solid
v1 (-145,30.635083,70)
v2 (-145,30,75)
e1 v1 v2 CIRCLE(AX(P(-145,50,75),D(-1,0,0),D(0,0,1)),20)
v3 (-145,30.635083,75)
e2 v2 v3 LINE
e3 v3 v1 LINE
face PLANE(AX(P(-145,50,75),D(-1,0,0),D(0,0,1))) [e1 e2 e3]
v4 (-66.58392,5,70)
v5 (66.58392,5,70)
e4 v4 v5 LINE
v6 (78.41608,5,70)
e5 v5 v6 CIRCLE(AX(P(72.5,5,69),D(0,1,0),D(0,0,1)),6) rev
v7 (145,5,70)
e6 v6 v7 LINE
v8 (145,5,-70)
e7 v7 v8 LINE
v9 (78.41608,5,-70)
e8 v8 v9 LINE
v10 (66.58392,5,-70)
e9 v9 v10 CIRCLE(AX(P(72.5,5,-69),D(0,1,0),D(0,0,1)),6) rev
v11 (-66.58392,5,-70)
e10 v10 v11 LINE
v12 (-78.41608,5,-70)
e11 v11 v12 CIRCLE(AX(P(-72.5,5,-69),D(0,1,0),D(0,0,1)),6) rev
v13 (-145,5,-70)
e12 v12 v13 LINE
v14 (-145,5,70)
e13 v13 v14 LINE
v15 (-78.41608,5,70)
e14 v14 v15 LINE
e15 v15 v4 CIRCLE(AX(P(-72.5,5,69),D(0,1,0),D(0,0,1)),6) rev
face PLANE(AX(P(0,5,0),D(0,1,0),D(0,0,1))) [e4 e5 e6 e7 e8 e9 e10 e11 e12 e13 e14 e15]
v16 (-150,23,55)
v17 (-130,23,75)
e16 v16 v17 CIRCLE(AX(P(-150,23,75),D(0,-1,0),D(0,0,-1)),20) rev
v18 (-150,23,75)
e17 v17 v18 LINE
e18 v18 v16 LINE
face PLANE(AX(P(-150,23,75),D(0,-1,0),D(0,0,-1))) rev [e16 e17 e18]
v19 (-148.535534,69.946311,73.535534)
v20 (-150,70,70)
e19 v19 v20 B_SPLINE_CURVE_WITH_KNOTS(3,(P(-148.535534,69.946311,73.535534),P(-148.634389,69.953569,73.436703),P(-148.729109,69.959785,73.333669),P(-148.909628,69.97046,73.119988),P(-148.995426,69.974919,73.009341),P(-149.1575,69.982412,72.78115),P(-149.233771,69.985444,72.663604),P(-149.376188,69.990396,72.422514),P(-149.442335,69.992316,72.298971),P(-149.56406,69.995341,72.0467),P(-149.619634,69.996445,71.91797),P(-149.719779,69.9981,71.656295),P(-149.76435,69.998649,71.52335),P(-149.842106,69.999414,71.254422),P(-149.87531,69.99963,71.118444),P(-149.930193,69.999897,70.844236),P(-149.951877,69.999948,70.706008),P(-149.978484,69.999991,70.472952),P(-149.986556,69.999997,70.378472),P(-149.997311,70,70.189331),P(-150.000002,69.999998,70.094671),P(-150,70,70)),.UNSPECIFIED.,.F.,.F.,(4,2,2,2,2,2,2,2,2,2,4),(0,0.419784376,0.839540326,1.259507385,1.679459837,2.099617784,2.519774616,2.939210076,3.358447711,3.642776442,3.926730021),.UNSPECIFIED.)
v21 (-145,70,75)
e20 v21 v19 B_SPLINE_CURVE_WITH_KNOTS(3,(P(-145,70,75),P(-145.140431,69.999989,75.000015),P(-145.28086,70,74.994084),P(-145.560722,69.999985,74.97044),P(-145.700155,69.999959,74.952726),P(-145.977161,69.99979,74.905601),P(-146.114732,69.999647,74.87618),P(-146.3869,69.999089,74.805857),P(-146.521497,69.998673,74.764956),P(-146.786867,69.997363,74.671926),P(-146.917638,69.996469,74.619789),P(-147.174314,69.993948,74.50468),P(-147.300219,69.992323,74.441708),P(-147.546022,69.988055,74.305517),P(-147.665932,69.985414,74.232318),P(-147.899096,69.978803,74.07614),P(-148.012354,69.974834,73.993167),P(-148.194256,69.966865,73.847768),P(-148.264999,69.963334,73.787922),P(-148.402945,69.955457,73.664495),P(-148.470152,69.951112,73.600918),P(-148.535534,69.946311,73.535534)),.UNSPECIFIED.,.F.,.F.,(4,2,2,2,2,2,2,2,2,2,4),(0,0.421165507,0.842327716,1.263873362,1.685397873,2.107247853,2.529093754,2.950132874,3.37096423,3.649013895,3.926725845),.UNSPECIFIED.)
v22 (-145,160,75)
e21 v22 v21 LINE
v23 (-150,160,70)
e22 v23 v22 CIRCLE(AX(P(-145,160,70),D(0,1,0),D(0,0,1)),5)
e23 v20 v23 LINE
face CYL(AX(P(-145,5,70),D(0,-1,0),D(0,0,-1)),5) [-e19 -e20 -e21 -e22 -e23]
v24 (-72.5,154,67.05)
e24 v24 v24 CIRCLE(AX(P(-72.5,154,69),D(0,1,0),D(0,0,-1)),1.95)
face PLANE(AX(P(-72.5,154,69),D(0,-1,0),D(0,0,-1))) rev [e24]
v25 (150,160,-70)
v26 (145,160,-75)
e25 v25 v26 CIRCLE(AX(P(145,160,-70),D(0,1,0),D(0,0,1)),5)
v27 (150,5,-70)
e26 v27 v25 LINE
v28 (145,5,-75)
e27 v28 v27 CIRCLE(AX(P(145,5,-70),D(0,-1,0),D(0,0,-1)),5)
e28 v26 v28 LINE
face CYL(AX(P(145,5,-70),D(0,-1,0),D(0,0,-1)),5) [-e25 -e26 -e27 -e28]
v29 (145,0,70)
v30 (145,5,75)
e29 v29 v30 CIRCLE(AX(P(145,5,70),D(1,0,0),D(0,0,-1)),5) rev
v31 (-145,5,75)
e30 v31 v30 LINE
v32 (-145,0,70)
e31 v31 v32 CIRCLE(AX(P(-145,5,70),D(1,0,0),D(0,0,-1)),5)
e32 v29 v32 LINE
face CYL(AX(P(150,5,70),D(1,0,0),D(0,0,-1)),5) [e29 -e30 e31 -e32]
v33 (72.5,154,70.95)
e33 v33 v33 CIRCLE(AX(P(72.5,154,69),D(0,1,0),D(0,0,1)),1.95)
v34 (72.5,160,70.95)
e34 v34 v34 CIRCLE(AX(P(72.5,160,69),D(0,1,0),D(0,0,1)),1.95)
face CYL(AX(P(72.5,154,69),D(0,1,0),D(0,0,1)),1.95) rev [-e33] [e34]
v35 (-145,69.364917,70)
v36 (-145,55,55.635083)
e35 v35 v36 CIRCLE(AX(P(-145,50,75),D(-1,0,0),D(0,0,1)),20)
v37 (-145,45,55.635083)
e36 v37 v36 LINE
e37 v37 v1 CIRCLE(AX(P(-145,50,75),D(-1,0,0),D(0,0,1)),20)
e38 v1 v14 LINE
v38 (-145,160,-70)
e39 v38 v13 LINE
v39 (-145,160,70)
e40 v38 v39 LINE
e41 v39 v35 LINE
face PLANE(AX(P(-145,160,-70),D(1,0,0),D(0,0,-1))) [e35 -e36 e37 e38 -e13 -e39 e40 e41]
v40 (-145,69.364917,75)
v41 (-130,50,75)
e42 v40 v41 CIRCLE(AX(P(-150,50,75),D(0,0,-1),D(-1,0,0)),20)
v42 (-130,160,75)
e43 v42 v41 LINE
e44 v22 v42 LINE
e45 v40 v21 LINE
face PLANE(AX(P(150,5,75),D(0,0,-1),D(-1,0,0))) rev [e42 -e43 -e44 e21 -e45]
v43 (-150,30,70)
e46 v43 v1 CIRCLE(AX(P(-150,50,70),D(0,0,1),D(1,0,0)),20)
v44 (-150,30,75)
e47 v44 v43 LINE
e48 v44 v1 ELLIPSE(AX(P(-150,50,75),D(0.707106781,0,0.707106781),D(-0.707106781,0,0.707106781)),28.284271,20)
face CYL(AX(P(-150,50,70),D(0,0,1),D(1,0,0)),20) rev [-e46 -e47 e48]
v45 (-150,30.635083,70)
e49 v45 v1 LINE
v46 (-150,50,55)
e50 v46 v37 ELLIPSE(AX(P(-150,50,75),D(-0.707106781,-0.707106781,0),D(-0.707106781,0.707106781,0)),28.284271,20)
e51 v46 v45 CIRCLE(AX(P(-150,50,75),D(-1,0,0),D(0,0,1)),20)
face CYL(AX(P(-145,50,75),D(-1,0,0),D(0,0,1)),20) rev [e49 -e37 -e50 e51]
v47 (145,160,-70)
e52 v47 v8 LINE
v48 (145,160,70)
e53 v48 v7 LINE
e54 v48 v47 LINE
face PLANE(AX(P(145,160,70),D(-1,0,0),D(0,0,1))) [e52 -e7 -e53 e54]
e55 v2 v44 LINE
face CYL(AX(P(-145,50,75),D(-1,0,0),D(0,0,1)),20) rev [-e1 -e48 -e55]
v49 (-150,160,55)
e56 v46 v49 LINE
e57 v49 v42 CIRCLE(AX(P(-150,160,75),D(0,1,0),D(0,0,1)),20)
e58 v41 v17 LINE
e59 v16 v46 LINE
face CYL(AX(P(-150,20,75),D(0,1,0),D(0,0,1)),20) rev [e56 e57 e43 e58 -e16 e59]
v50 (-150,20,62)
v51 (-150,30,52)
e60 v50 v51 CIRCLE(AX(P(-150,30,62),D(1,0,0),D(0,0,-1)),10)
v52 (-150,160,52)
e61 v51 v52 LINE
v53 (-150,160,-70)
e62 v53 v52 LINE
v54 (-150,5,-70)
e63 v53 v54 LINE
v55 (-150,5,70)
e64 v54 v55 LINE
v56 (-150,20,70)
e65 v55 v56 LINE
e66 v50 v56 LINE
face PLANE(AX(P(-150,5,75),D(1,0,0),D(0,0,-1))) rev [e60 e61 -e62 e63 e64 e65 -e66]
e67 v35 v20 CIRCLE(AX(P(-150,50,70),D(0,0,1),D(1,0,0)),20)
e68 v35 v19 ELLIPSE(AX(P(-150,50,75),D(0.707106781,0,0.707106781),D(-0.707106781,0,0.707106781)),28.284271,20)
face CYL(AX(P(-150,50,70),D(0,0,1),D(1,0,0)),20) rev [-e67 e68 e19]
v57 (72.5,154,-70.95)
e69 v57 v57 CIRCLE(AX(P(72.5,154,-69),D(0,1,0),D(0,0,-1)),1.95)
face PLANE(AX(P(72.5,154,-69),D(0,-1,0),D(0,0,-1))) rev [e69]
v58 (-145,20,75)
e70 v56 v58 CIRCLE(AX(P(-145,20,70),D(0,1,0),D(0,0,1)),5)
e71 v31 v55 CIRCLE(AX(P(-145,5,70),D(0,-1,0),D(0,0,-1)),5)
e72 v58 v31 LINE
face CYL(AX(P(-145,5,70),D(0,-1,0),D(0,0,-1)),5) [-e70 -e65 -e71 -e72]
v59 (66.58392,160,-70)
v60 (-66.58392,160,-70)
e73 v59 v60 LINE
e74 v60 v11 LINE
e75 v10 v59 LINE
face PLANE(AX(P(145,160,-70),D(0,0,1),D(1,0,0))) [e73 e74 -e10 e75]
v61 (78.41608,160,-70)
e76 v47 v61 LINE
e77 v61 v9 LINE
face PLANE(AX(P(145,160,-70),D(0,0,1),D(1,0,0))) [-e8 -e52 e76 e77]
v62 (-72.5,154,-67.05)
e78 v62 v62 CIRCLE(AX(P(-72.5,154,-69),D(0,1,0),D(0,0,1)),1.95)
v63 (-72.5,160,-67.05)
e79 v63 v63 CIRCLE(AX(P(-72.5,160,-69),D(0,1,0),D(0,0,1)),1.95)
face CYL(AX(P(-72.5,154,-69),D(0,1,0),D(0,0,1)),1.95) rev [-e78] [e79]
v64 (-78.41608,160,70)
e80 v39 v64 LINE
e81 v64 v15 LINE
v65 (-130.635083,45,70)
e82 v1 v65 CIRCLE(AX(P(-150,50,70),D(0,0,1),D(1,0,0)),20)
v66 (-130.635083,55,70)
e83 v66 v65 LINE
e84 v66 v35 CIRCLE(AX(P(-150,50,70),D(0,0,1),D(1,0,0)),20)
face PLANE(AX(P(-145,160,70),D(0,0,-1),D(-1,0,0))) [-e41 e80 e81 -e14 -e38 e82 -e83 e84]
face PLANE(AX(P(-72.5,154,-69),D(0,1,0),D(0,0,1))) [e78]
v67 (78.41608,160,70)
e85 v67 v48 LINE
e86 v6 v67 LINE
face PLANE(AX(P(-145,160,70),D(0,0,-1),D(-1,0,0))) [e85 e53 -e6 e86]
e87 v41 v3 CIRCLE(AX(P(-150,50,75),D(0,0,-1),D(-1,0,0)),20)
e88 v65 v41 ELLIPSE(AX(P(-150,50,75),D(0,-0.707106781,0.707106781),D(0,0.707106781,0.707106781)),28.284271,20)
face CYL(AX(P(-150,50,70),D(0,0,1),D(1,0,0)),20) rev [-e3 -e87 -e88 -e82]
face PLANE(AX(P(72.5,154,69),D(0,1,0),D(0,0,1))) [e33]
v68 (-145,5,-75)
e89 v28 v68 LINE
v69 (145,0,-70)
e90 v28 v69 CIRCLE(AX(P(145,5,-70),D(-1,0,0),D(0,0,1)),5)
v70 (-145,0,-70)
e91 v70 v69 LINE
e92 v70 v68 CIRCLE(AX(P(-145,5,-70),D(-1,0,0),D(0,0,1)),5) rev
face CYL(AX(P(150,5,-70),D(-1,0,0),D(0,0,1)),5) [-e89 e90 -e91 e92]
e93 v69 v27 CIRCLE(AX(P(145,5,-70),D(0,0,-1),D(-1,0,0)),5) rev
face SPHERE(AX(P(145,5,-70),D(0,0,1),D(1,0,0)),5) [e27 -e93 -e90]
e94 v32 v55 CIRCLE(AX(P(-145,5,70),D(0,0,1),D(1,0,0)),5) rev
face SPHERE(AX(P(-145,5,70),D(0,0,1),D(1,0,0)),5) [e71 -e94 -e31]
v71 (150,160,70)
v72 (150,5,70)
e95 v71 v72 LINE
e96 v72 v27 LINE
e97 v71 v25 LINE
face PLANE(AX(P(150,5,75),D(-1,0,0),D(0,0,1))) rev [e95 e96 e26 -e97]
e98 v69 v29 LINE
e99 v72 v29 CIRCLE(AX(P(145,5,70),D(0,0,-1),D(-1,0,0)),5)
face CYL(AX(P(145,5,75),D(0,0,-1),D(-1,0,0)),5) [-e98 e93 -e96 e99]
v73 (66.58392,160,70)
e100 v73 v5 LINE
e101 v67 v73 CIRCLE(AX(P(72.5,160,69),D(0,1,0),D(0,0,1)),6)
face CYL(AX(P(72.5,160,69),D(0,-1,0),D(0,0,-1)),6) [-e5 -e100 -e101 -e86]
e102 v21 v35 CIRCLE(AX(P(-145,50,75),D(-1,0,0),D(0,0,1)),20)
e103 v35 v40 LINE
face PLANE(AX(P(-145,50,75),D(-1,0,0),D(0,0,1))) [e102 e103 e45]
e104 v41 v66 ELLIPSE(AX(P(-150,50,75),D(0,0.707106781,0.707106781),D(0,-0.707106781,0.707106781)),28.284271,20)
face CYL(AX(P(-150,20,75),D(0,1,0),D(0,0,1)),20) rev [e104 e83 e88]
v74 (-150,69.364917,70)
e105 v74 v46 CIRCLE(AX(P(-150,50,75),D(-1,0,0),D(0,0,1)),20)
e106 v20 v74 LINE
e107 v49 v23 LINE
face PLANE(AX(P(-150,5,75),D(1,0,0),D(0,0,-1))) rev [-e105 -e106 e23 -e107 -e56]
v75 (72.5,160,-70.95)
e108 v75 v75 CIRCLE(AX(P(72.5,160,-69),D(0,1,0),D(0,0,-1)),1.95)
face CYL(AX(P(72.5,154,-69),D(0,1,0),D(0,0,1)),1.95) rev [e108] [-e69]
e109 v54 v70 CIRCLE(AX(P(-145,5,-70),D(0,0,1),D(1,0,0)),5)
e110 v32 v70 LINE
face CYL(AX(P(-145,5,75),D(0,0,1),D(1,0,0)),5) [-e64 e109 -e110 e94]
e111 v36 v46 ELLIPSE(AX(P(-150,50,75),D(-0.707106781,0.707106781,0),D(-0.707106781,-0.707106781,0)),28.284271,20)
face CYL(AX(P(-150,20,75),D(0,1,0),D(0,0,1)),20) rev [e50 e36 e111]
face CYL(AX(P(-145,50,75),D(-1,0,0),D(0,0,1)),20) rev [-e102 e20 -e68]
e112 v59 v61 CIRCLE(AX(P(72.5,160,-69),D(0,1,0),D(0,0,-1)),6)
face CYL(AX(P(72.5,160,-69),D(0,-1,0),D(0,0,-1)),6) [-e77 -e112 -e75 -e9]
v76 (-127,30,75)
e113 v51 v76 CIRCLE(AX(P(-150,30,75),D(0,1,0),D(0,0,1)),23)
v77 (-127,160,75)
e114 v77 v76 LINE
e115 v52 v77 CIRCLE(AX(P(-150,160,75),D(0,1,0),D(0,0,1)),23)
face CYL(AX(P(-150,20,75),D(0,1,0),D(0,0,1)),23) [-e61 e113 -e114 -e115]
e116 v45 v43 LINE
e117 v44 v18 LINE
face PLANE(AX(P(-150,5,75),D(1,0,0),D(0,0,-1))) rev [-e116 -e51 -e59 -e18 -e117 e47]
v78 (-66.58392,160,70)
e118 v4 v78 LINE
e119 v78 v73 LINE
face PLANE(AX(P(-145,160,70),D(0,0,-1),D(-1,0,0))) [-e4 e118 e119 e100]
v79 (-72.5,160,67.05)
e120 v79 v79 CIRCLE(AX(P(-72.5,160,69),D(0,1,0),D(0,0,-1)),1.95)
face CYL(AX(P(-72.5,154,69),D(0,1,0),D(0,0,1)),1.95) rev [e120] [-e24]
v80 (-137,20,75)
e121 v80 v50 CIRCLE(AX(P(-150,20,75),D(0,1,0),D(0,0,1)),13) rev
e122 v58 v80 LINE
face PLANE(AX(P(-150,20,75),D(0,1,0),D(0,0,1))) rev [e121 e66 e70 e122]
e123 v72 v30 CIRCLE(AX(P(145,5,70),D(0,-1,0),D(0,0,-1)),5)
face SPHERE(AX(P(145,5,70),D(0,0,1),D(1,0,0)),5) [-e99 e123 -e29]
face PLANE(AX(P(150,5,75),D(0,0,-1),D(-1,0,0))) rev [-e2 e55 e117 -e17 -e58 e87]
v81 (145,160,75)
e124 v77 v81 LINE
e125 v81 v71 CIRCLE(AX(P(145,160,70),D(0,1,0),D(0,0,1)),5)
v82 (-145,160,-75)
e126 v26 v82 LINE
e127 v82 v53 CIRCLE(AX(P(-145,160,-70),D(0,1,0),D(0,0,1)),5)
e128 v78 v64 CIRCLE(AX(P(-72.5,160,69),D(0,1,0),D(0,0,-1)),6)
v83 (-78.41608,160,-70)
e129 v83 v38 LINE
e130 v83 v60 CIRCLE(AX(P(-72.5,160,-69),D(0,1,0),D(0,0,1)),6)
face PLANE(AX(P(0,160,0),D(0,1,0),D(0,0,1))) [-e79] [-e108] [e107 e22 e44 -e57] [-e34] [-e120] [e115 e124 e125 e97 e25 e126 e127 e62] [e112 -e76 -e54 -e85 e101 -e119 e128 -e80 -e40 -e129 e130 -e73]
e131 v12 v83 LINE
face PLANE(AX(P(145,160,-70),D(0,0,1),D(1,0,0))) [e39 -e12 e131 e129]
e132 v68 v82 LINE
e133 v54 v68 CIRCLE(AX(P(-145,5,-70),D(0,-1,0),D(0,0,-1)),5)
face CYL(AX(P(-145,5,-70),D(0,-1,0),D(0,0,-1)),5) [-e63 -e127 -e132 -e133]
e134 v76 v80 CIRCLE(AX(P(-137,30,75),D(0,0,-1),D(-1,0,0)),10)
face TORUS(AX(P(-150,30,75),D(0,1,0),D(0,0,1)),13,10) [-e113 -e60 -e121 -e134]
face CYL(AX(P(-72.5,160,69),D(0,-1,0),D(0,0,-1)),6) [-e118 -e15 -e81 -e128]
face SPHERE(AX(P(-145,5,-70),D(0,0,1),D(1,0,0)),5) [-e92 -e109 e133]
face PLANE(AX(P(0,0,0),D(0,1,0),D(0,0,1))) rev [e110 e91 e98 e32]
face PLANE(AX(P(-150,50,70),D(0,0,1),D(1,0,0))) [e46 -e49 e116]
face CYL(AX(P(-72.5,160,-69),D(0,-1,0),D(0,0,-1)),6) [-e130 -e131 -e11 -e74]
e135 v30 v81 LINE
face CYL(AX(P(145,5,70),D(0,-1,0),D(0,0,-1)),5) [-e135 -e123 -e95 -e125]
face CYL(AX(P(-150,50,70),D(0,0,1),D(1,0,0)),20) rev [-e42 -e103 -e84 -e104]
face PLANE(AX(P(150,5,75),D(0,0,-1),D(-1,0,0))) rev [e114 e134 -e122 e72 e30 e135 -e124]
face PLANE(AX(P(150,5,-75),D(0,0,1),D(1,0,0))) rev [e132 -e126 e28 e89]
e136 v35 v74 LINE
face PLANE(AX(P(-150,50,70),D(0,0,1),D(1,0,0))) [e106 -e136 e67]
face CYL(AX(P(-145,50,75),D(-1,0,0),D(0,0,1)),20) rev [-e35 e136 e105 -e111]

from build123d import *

# Parameters (mm, degrees)
ESQUISSE1_W             = 300
ESQUISSE1_H             = 150
BOSS_EXTRU_1_DEPTH      = 5
ESQUISSE3_W             = 300
ESQUISSE3_H             = 150
ESQUISSE3_W_2           = 290
ESQUISSE3_H_2           = 140
BOSS_EXTRU_2_DEPTH      = 155
ESQUISSE4_R             = 6
BOSS_EXTRU_4_DEPTH      = 155
ESQUISSE5_R             = 1.95
ENL_V_MAT_EXTRU_1_DEPTH = 6
ESQUISSE6_R             = 20
ENL_V_MAT_EXTRU_2_DEPTH = 5
ESQUISSE7_R             = 20
ENL_V_MAT_EXTRU_3_DEPTH = 5
ESQUISSE8_R             = 23
ESQUISSE8_R_2           = 20
BOSS_EXTRU_5_DEPTH      = 140
BOSS_EXTRU_6_START      = -3
ESQUISSE9_R             = 20
BOSS_EXTRU_6_DEPTH      = 3
BOSS_EXTRU_7_DEPTH      = 3
CONG_1_R                = 10
CONG_2_R                = 5
CONG_3_R                = 5
ESQUISSE12_W            = 17.449944321
ESQUISSE12_H            = 17.449944321
ENL_V_MAT_EXTRU_5_DEPTH = 152


# Some blends are built 0.0001 mm under size
with BuildPart() as part:
    # Esquisse1 → Boss.-Extru.1 (new body)
    with BuildSketch(Plane(origin=(0, 0, 0), x_dir=(1, 0, 0), z_dir=(0, 1, 0))):
        Rectangle(ESQUISSE1_W, ESQUISSE1_H)
    extrude(amount=BOSS_EXTRU_1_DEPTH)

    # Esquisse3 → Boss.-Extru.2 (add)
    with BuildSketch(Plane(origin=(0, 5, 0), x_dir=(1, 0, 0), z_dir=(0, 1, 0))):
        Rectangle(ESQUISSE3_W, ESQUISSE3_H)
        Rectangle(ESQUISSE3_W_2, ESQUISSE3_H_2, mode=Mode.SUBTRACT)
    extrude(amount=BOSS_EXTRU_2_DEPTH)

    # Esquisse4 → Boss.-Extru.4 (add)
    with BuildSketch(Plane(origin=(0, 5, 0), x_dir=(1, 0, 0), z_dir=(0, 1, 0))):
        with Locations((-72.5, 69)):
            Circle(ESQUISSE4_R)
        with Locations((72.5, 69)):
            Circle(ESQUISSE4_R)
        with Locations((72.5, -69)):
            Circle(ESQUISSE4_R)
        with Locations((-72.5, -69)):
            Circle(ESQUISSE4_R)
    extrude(amount=BOSS_EXTRU_4_DEPTH)

    # Esquisse5 → Enlèv. mat.-Extru.1 (cut)
    with BuildSketch(Plane(origin=(0, 160, 0), x_dir=(1, 0, 0), z_dir=(0, 1, 0))):
        with Locations(Location((-72.5, 69, 0), (0, 0, 270))):
            Circle(ESQUISSE5_R)
        with Locations(Location((72.5, 69, 0), (0, 0, 90))):
            Circle(ESQUISSE5_R)
        with Locations(Location((72.5, -69, 0), (0, 0, 270))):
            Circle(ESQUISSE5_R)
        with Locations(Location((-72.5, -69, 0), (0, 0, 90))):
            Circle(ESQUISSE5_R)
    extrude(amount=-ENL_V_MAT_EXTRU_1_DEPTH, mode=Mode.SUBTRACT)

    # Esquisse6 → Enlèv. mat.-Extru.2 (cut)
    with BuildSketch(Plane.XY.offset(75)):
        with Locations((-150, 50)):
            Circle(ESQUISSE6_R)
    extrude(amount=-ENL_V_MAT_EXTRU_2_DEPTH, mode=Mode.SUBTRACT)

    # Esquisse7 → Enlèv. mat.-Extru.3 (cut)
    with BuildSketch(Plane.ZY.offset(150)):
        with Locations((75, 50)):
            Circle(ESQUISSE7_R)
    extrude(amount=-ENL_V_MAT_EXTRU_3_DEPTH, mode=Mode.SUBTRACT)

    # Esquisse8 → Boss.-Extru.5 (add)
    with BuildSketch(Plane(origin=(0, 160, 0), x_dir=(1, 0, 0), z_dir=(0, 1, 0))):
        with Locations((-150, -75)):
            Circle(ESQUISSE8_R)
        with Locations((-150, -75)):
            Circle(ESQUISSE8_R_2, mode=Mode.SUBTRACT)
    extrude(amount=-BOSS_EXTRU_5_DEPTH)

    # Esquisse9 → Boss.-Extru.6 (add)
    with BuildSketch(Plane.XZ.offset(-20).offset(BOSS_EXTRU_6_START)):
        with Locations((-150, 75)):
            Circle(ESQUISSE9_R)
    extrude(amount=BOSS_EXTRU_6_DEPTH)

    # Esquisse10 → Boss.-Extru.7 (add)
    with BuildSketch(Plane(origin=(0, 160, 0), x_dir=(1, 0, 0), z_dir=(0, 1, 0))):
        with BuildLine():
            Line((-150, -52), (-150, -75))
            Line((-150, -75), (-127, -75))
            ThreePointArc((-127, -75), (-133.736544033, -58.736544033), (-150, -52))
        make_face()
    extrude(amount=-BOSS_EXTRU_7_DEPTH)

    # Congé1
    cong_1_edges = [part.edges().sort_by_distance(p)[0] for p in [
        (-166.263455967, 20, 91.263455967),
    ]]
    fillet(cong_1_edges, radius=CONG_1_R)

    # Congé2
    cong_2_edges = [part.edges().sort_by_distance(p)[0] for p in [
        (0, 0, -75),
        (150, 0, 0),
        (0, 0, 75),
        (-150, 0, 0),
    ]]
    fillet(cong_2_edges, radius=CONG_2_R - 0.0001)  # a hair under: the kernel refuses the full size

    # Congé3
    # the kernel refuses this fillet: 5 mm, written as the material it takes off along each edge
    with BuildSketch(Plane(origin=(-145, 0, 70), x_dir=(0, 0, 1), z_dir=(1, 0, 0))) as cong_3_piece_1:
        with BuildLine():
            CenterArc((0.0001, -4.9999), 4.9999, 0, 90)
            Line((5, -4.9999), (5, 0))
            Line((5, 0), (0.0001, 0))
        make_face()
    revolve(axis=Axis((-145, 0, 70), (0, -1, 0)), revolution_arc=90, mode=Mode.SUBTRACT)
    with BuildSketch(Plane(origin=(-145, 0, -70), x_dir=(-1, 0, 0), z_dir=(0, 0, 1))) as cong_3_piece_2:
        with BuildLine():
            CenterArc((0.0001, -4.9999), 4.9999, 0, 90)
            Line((5, -4.9999), (5, 0))
            Line((5, 0), (0.0001, 0))
        make_face()
    revolve(axis=Axis((-145, 0, -70), (0, -1, 0)), revolution_arc=90, mode=Mode.SUBTRACT)
    with BuildSketch(Plane(origin=(145, 0, -70), x_dir=(0, 0, -1), z_dir=(-1, 0, 0))) as cong_3_piece_3:
        with BuildLine():
            CenterArc((0.0001, -4.9999), 4.9999, 0, 90)
            Line((5, -4.9999), (5, 0))
            Line((5, 0), (0.0001, 0))
        make_face()
    revolve(axis=Axis((145, 0, -70), (0, -1, 0)), revolution_arc=90, mode=Mode.SUBTRACT)
    with BuildSketch(Plane(origin=(145, 0, 70), x_dir=(1, 0, 0), z_dir=(0, 0, -1))) as cong_3_piece_4:
        with BuildLine():
            CenterArc((0.0001, -4.9999), 4.9999, 0, 90)
            Line((5, -4.9999), (5, 0))
            Line((5, 0), (0.0001, 0))
        make_face()
    revolve(axis=Axis((145, 0, 70), (0, -1, 0)), revolution_arc=90, mode=Mode.SUBTRACT)
    with BuildSketch(Plane(origin=(-150, 20, 75), x_dir=(1, 0, 0), z_dir=(0, -1, 0))) as cong_3_piece_5:
        with BuildLine():
            CenterArc((CONG_3_R, -CONG_3_R), CONG_3_R, 90, 90)
            Line((0, -CONG_3_R), (0, 0))
            Line((0, 0), (CONG_3_R, 0))
        make_face()
    extrude(amount=20, mode=Mode.SUBTRACT)
    with BuildSketch(Plane(origin=(-150, 172.5, 75), x_dir=(1, 0, 0), z_dir=(0, -1, 0))) as cong_3_piece_6:
        with BuildLine():
            CenterArc((CONG_3_R, -CONG_3_R), CONG_3_R, 90, 90)
            Line((0, -CONG_3_R), (0, 0))
            Line((0, 0), (CONG_3_R, 0))
        make_face()
    extrude(amount=115, mode=Mode.SUBTRACT)
    with BuildSketch(Plane(origin=(-150, 172.5, -75), x_dir=(0, 0, 1), z_dir=(0, -1, 0)), Plane(origin=(150, 0, -75), x_dir=(0, 0, 1), z_dir=(0, 1, 0)), Plane(origin=(150, 0, 75), x_dir=(-1, 0, 0), z_dir=(0, 1, 0))) as cong_3_piece_7:
        with BuildLine():
            CenterArc((CONG_3_R, -CONG_3_R), CONG_3_R, 90, 90)
            Line((0, -CONG_3_R), (0, 0))
            Line((0, 0), (CONG_3_R, 0))
        make_face()
    extrude(amount=172.5, mode=Mode.SUBTRACT)

    # Esquisse12 → Enlèv. mat.-Extru.5 (cut)
    with BuildSketch(Plane(origin=(0, 160, 0), x_dir=(1, 0, 0), z_dir=(0, 1, 0))):
        with Locations((-136.27502784, -61.275027839)):
            Rectangle(ESQUISSE12_W, ESQUISSE12_H)
    extrude(amount=-ENL_V_MAT_EXTRU_5_DEPTH, mode=Mode.SUBTRACT)


solid = part.part
